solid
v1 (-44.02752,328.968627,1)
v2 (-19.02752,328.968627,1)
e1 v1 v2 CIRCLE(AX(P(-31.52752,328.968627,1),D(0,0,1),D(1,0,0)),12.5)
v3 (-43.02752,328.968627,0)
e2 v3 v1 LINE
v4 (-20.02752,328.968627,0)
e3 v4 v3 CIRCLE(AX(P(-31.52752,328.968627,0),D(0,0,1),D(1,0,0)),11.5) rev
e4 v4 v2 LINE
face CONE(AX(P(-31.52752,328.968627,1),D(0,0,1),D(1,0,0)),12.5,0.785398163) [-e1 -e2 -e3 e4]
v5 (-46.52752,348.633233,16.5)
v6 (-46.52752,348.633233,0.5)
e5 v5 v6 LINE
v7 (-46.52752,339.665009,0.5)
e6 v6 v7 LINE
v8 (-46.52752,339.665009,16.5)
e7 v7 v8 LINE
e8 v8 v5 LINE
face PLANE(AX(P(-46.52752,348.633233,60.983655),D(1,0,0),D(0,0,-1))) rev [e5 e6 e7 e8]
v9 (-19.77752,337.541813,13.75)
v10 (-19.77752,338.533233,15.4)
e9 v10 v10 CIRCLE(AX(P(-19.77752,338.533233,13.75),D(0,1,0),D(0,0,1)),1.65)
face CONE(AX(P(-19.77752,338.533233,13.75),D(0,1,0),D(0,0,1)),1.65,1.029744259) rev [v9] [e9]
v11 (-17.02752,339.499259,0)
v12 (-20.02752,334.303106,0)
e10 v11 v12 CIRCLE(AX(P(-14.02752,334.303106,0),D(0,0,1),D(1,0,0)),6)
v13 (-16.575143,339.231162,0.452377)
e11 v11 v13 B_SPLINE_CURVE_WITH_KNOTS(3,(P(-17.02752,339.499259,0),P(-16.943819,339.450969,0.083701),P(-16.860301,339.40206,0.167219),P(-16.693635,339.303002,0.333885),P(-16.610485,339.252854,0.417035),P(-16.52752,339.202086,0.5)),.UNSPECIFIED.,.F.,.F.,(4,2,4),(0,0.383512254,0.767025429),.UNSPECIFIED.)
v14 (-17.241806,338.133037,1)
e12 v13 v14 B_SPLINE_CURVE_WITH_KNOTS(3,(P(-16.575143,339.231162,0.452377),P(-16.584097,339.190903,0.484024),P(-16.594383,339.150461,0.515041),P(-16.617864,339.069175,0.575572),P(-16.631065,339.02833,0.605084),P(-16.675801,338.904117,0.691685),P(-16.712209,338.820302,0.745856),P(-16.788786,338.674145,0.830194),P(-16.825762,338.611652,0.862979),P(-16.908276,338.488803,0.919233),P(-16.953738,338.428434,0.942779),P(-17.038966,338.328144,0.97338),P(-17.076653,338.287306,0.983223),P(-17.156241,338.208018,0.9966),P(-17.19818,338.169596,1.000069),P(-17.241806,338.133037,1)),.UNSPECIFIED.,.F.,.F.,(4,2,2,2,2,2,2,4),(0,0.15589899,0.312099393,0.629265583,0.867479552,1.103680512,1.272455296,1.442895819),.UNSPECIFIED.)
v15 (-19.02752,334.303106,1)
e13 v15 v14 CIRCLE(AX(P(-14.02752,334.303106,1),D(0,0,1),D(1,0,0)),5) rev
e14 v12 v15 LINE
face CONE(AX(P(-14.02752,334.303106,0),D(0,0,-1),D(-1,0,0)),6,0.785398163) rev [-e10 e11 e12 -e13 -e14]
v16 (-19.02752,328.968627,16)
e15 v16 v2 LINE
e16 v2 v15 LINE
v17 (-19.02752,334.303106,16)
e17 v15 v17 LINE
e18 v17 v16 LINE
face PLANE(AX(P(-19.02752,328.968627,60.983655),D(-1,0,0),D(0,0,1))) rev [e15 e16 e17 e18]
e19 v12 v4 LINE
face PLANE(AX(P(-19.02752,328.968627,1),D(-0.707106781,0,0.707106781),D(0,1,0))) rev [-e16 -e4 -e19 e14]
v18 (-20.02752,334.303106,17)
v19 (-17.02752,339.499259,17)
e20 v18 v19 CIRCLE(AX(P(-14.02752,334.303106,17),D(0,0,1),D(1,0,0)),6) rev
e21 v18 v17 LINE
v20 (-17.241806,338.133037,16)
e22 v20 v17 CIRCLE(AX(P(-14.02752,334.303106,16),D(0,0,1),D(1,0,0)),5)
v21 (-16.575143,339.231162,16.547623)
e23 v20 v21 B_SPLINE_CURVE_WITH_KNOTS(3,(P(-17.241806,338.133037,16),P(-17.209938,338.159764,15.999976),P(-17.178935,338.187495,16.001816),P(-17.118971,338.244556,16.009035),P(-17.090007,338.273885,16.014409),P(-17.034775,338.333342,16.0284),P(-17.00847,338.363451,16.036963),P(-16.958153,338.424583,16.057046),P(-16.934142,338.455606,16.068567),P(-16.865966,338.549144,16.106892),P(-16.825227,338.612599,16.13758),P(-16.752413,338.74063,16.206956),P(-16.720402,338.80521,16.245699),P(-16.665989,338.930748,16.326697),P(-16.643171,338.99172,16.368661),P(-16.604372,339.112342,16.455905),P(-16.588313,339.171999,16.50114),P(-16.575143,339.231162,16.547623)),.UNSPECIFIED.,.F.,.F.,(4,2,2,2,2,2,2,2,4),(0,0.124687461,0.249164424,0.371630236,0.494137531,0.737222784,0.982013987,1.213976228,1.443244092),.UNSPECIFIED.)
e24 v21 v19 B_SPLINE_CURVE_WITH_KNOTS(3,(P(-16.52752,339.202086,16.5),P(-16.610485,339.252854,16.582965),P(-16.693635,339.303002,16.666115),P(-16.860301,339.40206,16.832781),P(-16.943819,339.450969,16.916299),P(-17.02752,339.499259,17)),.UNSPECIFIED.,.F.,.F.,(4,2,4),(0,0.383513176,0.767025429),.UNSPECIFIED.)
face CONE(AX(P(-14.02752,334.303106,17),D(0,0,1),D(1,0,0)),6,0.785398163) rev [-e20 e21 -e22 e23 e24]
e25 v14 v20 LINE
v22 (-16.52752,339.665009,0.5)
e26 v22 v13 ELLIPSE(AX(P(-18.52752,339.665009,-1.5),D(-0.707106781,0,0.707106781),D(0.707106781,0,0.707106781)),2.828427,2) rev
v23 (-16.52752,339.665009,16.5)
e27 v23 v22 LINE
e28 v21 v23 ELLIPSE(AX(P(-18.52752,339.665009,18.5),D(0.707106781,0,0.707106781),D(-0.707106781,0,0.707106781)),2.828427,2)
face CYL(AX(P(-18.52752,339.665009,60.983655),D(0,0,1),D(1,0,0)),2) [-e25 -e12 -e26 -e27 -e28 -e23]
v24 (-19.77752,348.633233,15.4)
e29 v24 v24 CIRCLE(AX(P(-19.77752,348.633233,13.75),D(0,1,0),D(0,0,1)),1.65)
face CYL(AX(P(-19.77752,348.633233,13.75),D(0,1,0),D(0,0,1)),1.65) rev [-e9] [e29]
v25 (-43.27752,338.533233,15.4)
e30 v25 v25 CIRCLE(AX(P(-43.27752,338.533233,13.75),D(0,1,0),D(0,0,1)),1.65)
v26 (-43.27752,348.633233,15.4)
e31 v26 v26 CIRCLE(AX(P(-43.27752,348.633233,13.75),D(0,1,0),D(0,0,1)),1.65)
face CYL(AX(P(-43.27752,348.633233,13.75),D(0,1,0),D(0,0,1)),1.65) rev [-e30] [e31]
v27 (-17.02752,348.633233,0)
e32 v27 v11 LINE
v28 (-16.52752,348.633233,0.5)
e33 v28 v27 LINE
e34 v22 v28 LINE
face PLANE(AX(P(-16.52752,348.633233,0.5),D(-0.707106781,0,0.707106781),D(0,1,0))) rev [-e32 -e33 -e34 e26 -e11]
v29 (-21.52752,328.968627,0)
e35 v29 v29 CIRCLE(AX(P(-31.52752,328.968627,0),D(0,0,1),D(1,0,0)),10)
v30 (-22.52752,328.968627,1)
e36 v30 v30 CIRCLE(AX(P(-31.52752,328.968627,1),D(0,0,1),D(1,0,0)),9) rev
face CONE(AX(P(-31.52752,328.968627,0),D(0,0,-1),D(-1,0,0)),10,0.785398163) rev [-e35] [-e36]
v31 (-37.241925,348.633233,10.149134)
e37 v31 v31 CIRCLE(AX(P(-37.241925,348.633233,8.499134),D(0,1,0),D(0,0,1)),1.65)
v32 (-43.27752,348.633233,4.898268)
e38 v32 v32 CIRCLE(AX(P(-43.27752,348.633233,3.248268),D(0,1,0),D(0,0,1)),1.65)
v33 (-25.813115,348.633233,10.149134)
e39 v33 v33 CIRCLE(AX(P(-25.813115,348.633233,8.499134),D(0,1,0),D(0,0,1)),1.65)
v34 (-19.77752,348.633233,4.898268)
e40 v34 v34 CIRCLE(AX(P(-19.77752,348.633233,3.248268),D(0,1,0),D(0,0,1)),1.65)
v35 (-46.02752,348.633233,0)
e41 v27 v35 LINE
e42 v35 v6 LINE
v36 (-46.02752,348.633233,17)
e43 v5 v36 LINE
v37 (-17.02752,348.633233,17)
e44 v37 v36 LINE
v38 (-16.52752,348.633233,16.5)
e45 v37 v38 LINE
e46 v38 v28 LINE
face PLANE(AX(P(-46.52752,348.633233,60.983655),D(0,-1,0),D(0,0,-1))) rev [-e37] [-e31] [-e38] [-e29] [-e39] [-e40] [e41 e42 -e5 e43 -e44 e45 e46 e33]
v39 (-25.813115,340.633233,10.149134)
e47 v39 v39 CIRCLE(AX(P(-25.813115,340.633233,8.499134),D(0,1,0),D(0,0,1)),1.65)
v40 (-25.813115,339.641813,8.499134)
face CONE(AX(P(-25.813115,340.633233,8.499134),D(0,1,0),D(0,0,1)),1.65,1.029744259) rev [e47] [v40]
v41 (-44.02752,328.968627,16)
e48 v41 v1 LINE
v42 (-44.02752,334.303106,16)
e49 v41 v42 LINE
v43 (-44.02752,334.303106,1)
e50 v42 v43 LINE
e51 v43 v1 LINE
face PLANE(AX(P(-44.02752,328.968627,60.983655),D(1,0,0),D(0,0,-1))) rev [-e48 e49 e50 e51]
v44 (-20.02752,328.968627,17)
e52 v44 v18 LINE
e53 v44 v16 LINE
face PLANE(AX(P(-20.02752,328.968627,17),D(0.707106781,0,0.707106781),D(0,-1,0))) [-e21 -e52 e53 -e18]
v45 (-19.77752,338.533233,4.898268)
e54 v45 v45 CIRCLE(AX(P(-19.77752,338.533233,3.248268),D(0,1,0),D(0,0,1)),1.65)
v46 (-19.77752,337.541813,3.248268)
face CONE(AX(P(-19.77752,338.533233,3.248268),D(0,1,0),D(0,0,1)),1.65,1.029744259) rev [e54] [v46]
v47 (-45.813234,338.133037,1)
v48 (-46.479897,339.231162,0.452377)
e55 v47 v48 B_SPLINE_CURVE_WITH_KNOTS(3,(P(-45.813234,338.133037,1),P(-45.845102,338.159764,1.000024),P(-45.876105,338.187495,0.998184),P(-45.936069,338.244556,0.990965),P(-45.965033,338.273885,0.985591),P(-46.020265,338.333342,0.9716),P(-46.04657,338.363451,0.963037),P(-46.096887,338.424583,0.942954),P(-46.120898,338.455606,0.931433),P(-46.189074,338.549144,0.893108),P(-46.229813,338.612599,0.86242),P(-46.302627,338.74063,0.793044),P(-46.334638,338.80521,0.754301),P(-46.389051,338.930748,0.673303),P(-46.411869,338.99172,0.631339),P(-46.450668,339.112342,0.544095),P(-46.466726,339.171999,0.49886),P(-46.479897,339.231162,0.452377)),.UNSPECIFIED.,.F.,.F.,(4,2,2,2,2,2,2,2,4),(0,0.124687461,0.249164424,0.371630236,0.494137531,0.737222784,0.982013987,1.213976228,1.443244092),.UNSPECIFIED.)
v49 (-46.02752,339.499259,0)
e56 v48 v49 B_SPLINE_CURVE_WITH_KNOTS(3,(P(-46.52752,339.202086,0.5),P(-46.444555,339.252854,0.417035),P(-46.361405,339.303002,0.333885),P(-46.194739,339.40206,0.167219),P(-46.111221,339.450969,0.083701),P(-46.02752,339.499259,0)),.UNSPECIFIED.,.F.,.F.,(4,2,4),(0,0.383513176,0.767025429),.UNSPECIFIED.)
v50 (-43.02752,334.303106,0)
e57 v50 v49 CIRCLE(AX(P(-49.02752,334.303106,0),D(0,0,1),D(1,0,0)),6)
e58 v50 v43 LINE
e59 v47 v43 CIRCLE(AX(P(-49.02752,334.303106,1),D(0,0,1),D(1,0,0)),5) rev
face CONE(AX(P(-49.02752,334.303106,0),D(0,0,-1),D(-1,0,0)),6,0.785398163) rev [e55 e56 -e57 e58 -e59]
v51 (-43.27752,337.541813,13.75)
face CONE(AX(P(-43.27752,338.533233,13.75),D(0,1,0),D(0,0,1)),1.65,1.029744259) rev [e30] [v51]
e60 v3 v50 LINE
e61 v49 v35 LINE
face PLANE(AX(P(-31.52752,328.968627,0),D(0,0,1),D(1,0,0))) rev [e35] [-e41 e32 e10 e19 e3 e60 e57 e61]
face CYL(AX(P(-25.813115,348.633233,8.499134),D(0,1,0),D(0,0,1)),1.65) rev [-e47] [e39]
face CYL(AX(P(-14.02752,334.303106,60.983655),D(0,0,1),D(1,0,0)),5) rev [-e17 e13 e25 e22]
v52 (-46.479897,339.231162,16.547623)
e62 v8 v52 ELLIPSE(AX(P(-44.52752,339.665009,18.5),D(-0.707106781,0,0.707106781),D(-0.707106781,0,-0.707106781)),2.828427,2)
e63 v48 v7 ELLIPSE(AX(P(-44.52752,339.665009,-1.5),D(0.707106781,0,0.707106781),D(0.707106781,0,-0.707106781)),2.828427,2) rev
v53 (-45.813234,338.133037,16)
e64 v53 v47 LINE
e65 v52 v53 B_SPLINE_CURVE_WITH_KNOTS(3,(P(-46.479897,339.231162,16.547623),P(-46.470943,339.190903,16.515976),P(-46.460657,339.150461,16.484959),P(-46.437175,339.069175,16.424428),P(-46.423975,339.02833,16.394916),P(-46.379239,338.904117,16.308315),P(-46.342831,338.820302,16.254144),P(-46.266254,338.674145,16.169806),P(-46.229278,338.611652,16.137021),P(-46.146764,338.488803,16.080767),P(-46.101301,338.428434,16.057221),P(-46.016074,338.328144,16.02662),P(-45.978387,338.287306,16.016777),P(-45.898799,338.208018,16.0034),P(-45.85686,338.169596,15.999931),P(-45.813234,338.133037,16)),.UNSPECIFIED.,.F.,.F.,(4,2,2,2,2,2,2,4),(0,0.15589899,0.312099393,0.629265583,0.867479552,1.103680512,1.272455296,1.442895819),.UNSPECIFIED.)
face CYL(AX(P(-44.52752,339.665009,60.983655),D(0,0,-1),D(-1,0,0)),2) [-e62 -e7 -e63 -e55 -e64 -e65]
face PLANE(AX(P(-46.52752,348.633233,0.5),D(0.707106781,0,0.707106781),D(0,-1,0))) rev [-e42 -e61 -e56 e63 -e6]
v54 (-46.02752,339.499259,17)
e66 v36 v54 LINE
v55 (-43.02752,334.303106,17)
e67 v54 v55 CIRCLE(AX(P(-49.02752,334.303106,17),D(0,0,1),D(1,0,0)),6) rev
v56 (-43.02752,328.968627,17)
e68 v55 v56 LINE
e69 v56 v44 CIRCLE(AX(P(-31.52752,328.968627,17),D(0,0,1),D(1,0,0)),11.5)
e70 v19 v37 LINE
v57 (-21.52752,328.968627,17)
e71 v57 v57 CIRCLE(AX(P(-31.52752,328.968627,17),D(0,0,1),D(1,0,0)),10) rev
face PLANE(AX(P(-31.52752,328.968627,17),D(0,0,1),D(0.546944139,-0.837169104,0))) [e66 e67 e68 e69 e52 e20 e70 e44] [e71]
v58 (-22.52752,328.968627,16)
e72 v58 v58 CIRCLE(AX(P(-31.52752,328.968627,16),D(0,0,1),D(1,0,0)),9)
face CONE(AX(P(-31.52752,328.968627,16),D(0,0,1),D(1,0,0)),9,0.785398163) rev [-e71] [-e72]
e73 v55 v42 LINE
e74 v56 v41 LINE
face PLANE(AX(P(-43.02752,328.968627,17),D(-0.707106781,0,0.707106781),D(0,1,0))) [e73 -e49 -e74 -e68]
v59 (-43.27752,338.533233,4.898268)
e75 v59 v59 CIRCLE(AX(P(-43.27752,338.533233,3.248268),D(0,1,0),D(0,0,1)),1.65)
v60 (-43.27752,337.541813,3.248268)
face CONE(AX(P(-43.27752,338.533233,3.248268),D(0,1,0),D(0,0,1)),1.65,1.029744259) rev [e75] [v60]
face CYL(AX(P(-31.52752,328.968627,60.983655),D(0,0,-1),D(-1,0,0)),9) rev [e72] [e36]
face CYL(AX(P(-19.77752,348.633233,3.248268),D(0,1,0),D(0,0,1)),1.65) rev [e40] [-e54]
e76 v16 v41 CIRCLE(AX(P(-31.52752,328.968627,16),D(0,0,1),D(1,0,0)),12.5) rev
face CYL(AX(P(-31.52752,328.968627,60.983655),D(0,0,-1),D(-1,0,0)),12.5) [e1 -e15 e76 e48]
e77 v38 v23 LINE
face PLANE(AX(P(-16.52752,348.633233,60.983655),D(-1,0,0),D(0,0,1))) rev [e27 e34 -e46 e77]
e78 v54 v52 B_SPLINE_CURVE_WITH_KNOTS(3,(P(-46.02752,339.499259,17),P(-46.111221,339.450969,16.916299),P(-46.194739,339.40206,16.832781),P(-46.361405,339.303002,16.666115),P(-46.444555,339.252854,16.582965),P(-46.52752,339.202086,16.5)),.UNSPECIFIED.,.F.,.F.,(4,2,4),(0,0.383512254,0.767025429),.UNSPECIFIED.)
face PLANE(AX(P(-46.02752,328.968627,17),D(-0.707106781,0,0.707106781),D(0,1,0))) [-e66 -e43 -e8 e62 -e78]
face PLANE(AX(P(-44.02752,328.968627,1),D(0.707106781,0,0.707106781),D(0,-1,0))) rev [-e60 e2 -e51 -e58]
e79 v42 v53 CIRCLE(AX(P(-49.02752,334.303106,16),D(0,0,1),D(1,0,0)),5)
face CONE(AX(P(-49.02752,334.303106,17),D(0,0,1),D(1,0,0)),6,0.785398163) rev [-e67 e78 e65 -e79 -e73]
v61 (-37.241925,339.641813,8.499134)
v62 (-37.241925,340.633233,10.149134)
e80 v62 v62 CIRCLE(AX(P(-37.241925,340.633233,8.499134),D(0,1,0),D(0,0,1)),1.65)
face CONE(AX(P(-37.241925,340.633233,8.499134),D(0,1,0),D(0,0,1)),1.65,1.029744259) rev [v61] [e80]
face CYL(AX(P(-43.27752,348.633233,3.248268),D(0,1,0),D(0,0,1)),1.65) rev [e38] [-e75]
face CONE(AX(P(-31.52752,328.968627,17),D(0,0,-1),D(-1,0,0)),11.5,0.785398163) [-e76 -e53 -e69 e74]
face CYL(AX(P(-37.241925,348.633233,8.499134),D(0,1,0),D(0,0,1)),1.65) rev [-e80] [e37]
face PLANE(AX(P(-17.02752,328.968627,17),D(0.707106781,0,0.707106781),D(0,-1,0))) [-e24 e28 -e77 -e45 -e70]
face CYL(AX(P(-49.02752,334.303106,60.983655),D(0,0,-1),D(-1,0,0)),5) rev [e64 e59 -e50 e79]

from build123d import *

# Parameters (mm, degrees)
SKETCH_1_R             = 9
EXTRUDE_2_DEPTH        = 17
FILLET_7_R             = 5
CHAMFER_3_SIZE         = 1
CHAMFER_4_SIZE         = 1
CHAMFER_5_SIZE         = 0.5
FILLET_9_R             = 2
HOLE_WIZARD_M4_3_D     = 3.3
HOLE_WIZARD_M4_3_DEPTH = 10.1
HOLE_WIZARD_M4_3_TIP   = 0.991420021
HOLE_WIZARD_M4_4_D     = 3.3
HOLE_WIZARD_M4_4_DEPTH = 8
HOLE_WIZARD_M4_4_TIP   = 0.991420021


with BuildPart() as part:
    # 草图1 → 凸台-拉伸2 (new body)
    with BuildSketch(Plane.XY):
        with BuildLine():
            Line((-16.527519938, 348.633233256), (-16.527519938, 338.633233256))
            Line((-16.527519938, 338.633233256), (-19.027519938, 338.633233256))
            Line((-19.027519938, 338.633233256), (-19.027519938, 328.968626967))
            ThreePointArc((-19.027519938, 328.968626967), (-31.527519938, 316.468626967), (-44.027519938, 328.968626967))
            Line((-44.027519938, 328.968626967), (-44.027519938, 338.633233256))
            Line((-44.027519938, 338.633233256), (-46.527519938, 338.633233256))
            Line((-46.527519938, 338.633233256), (-46.527519938, 348.633233256))
            Line((-46.527519938, 348.633233256), (-16.527519938, 348.633233256))
        make_face()
        with Locations((-31.527519938, 328.968626967)):
            Circle(SKETCH_1_R, mode=Mode.SUBTRACT)
    extrude(amount=EXTRUDE_2_DEPTH)

    # 圆角7
    # the kernel refuses this fillet: 5 mm, written as the material it adds along each edge
    with BuildSketch(Plane(origin=(-19.027519938, 338.633233256, 0), x_dir=(1, 0, 0), z_dir=(0, 0, 1))) as fillet_7_piece_1:
        with BuildLine():
            CenterArc((5, -4.330127019), FILLET_7_R, 120, 60)
            Line((0, -4.330127019), (-0.1, -4.330127019))
            Line((-0.1, -4.330127019), (-0.1, 0))
            Line((-0.1, 0), (0, 0.1))
            ThreePointArc((0, 0.1), (1.25, 0.1), (2.45, 0.08660254))
            Line((2.45, 0.08660254), (2.5, 0))
        make_face()
    extrude(amount=17)
    with BuildSketch(Plane(origin=(-44.027519938, 338.633233256, 0), x_dir=(0, -1, 0), z_dir=(0, 0, 1))) as fillet_7_piece_2:
        with BuildLine():
            CenterArc((4.330127019, -5), FILLET_7_R, 90, 60)
            Line((0, -2.5), (-0.08660254, -2.45))
            ThreePointArc((-0.08660254, -2.45), (-0.1, -1.25), (-0.1, 0))
            Line((-0.1, 0), (0, 0.1))
            Line((0, 0.1), (4.330127019, 0.1))
            Line((4.330127019, 0.1), (4.330127019, 0))
        make_face()
    extrude(amount=17)

    # 倒角3
    chamfer_3_edges = [part.edges().sort_by_distance(p)[0] for p in [
        (-31.527519938, 316.468626967, 17),
        (-19.027519938, 331.635866602, 17),
        (-44.027519938, 331.635866602, 17),
        (-18.357646957, 336.803106237, 17),
        (-44.697392919, 336.803106237, 17),
    ]]
    chamfer(chamfer_3_edges, length=CHAMFER_3_SIZE)

    # 倒角4
    chamfer_4_edges = [part.edges().sort_by_distance(p)[0] for p in [
        (-19.027519938, 331.635866602, 0),
        (-31.527519938, 316.468626967, 0),
        (-40.527519938, 328.968626967, 0),
        (-40.527519938, 328.968626967, 17),
        (-44.027519938, 331.635866602, 0),
        (-18.357646957, 336.803106237, 0),
        (-44.697392919, 336.803106237, 0),
    ]]
    chamfer(chamfer_4_edges, length=CHAMFER_4_SIZE)

    # 倒角5
    chamfer_5_edges = [part.edges().sort_by_distance(p)[0] for p in [
        (-16.527519938, 344.195347776, 0),
        (-16.527519938, 344.195347776, 17),
        (-46.527519938, 344.195347776, 0),
        (-46.527519938, 344.195347776, 17),
    ]]
    chamfer(chamfer_5_edges, length=CHAMFER_5_SIZE)

    # 圆角9
    fillet_9_edges = [part.edges().sort_by_distance(p)[0] for p in [
        (-16.527519938, 338.633233256, 8.5),
        (-46.527519938, 338.633233256, 8.5),
    ]]
    fillet(fillet_9_edges, radius=FILLET_9_R)

    # M4 螺纹孔3
    with Locations(Plane(origin=(0, 348.633233256, 0), x_dir=(1, 0, 0), z_dir=(0, 1, 0))):
        with Locations((-19.777519938, -13.75), (-43.277519938, -13.75), (-43.277519938, -3.248268424), (-19.777519938, -3.248268424)):
            Hole(HOLE_WIZARD_M4_3_D / 2, depth=HOLE_WIZARD_M4_3_DEPTH)
            with Locations((0, 0, -(HOLE_WIZARD_M4_3_DEPTH + HOLE_WIZARD_M4_3_TIP / 2))):  # 118° drill point
                Cone(0, HOLE_WIZARD_M4_3_D / 2, HOLE_WIZARD_M4_3_TIP, mode=Mode.SUBTRACT)

    # M4 螺纹孔4
    with Locations(Plane(origin=(0, 348.633233256, 0), x_dir=(1, 0, 0), z_dir=(0, 1, 0))):
        with Locations((-37.241924816, -8.499134212), (-25.81311506, -8.499134212)):
            Hole(HOLE_WIZARD_M4_4_D / 2, depth=HOLE_WIZARD_M4_4_DEPTH)
            with Locations((0, 0, -(HOLE_WIZARD_M4_4_DEPTH + HOLE_WIZARD_M4_4_TIP / 2))):  # 118° drill point
                Cone(0, HOLE_WIZARD_M4_4_D / 2, HOLE_WIZARD_M4_4_TIP, mode=Mode.SUBTRACT)


solid = part.part
